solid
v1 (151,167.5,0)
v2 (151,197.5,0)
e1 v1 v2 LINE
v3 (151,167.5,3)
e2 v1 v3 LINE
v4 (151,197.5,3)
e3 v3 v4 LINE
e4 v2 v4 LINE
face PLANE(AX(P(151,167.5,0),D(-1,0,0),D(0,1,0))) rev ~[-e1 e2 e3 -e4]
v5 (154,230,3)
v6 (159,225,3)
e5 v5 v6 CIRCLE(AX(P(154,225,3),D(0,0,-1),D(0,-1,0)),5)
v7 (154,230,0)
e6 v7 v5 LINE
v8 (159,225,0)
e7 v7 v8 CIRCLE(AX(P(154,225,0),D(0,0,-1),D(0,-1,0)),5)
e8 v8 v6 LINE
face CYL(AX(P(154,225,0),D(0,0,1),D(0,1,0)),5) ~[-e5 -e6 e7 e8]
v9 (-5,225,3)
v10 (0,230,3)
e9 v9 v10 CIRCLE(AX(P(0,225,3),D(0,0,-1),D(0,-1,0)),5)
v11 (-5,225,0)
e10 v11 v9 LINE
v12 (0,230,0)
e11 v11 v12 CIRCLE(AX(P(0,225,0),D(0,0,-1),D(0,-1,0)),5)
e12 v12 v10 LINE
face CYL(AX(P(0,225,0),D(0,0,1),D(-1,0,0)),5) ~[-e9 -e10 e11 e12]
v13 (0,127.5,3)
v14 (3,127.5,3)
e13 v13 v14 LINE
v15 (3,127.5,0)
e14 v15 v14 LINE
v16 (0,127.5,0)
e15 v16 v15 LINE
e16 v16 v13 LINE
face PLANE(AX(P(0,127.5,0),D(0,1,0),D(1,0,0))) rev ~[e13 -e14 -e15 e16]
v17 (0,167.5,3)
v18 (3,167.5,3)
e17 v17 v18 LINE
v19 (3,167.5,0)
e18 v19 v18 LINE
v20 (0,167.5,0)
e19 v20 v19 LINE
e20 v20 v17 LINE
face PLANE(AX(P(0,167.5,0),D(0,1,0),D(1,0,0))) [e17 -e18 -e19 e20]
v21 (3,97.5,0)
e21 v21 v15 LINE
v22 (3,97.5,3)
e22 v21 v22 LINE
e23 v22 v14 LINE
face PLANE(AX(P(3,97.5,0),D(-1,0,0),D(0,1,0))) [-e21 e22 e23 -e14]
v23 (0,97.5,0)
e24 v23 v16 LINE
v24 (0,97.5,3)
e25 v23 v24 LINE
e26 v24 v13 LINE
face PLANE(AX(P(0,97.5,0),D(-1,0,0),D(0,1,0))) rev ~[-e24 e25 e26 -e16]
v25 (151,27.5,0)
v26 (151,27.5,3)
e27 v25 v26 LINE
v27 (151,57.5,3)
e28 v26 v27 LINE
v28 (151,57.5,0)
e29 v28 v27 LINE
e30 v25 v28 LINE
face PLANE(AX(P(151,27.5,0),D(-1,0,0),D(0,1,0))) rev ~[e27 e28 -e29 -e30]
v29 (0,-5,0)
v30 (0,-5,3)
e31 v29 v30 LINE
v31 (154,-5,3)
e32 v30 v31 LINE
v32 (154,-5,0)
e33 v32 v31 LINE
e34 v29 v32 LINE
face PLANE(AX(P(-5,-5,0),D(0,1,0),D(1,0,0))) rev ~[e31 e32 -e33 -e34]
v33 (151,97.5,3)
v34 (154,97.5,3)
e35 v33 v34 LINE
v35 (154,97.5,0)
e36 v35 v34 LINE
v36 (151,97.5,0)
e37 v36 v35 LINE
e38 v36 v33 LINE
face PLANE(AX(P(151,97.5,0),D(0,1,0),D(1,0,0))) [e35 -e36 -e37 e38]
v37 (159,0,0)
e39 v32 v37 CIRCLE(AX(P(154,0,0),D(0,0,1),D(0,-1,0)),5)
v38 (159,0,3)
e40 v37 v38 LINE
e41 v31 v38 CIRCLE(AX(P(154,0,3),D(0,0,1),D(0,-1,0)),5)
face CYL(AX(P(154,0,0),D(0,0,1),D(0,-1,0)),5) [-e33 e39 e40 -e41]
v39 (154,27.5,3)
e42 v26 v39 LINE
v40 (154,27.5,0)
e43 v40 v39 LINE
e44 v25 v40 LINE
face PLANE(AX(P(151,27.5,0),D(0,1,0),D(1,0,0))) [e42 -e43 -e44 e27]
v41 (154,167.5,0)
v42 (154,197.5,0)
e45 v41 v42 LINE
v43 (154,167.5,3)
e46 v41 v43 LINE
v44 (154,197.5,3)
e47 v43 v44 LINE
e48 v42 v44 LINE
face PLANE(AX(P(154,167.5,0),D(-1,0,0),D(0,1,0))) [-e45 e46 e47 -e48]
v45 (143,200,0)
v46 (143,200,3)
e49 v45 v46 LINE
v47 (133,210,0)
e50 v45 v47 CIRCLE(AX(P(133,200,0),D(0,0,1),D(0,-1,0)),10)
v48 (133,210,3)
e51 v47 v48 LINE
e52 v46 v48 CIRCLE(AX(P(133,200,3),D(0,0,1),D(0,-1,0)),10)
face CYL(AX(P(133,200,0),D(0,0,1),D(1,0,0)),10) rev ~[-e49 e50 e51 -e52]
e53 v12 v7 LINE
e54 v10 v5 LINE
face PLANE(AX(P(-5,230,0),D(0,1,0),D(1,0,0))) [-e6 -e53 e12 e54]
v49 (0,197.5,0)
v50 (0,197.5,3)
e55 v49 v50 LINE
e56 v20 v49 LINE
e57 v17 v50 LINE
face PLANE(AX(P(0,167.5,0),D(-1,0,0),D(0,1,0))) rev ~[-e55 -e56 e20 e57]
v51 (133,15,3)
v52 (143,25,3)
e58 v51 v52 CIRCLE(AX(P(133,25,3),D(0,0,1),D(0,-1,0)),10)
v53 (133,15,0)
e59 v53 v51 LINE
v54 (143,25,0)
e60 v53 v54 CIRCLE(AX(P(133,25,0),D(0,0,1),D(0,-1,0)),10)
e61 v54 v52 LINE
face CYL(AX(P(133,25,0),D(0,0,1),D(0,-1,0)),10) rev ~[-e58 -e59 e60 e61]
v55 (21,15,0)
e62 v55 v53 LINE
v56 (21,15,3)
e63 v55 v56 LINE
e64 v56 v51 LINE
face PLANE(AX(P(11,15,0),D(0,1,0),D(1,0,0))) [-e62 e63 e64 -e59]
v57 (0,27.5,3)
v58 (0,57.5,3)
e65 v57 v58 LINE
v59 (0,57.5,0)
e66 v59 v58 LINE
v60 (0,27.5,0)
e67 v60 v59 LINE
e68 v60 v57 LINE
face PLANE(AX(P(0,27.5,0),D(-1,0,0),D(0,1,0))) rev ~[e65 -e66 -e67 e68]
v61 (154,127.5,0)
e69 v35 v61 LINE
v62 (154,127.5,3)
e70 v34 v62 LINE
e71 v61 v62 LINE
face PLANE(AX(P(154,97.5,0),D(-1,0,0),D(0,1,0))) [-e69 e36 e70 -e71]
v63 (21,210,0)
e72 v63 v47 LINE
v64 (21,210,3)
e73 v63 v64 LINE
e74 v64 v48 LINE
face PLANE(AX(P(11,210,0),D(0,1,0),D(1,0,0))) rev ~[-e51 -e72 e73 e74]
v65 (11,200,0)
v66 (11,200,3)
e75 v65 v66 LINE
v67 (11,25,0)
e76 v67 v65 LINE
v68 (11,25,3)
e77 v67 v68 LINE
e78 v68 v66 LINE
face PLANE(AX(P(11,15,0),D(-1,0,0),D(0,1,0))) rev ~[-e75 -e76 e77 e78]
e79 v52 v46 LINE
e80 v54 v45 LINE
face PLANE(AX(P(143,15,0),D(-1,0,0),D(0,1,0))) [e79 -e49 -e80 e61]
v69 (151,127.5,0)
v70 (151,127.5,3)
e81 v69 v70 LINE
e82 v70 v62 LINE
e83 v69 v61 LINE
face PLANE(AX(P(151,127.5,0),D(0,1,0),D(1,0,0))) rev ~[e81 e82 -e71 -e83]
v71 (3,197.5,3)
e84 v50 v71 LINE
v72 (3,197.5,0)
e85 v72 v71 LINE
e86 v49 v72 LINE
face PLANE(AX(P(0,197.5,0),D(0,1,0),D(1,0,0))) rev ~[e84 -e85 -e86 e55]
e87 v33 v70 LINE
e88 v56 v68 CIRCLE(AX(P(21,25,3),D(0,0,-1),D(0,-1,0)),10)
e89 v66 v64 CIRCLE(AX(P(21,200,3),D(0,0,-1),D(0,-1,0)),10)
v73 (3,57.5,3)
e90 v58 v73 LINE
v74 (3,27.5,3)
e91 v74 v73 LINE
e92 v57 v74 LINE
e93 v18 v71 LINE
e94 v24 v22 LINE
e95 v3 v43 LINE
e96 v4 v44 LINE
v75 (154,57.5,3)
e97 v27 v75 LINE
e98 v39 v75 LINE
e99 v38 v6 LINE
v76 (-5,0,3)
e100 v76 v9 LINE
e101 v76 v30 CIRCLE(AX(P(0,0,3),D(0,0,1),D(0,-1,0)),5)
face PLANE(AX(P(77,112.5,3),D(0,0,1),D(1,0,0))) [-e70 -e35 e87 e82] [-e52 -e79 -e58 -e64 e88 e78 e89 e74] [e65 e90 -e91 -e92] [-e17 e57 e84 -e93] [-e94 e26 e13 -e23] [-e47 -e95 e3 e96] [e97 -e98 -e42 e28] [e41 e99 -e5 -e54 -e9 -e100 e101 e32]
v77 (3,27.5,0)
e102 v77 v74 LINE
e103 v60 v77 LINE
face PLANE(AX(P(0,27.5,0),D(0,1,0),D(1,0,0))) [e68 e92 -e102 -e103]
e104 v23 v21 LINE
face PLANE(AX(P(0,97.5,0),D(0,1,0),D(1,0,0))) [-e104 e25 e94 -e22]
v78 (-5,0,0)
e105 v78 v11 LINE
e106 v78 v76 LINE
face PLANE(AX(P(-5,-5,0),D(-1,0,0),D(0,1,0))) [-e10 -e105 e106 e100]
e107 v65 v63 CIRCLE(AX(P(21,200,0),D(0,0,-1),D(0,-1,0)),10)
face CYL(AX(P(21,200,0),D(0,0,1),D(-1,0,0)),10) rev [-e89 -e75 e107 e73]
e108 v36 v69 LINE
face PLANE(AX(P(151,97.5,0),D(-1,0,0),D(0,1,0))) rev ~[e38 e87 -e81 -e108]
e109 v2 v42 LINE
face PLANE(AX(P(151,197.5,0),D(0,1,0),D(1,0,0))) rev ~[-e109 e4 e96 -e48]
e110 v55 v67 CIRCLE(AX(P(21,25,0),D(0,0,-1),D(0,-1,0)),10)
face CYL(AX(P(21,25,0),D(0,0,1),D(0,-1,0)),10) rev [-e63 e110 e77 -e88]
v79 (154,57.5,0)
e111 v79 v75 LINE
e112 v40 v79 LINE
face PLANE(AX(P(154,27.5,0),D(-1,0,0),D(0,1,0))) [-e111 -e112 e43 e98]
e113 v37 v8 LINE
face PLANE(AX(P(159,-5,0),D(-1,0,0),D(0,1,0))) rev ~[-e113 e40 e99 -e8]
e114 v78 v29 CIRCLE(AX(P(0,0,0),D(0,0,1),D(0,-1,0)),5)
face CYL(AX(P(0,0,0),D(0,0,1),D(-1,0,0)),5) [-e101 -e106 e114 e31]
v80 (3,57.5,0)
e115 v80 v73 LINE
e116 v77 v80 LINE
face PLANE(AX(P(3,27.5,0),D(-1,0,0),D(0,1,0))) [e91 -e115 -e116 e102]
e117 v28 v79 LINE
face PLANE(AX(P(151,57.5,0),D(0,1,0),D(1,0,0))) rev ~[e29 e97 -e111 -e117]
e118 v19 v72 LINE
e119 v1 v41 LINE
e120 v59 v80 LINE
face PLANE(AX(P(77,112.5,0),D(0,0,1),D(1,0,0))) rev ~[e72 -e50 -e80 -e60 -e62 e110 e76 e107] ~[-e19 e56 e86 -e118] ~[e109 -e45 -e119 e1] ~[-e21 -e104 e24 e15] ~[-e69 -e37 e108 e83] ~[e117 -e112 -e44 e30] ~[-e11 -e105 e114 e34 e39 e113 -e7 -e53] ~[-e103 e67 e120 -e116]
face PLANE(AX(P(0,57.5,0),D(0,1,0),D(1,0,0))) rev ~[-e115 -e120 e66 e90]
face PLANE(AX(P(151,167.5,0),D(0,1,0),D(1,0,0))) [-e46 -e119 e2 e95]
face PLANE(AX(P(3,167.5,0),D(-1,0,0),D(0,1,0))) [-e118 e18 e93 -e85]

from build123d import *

# Parameters (mm, degrees)
F0_W     = 164
F0_H     = 235
F0_W_2   = 3
F0_H_2   = 30
F0_W_3   = 132
F0_H_3   = 195
F1_DEPTH = 3
F2_R     = 5
F3_R     = 10


with BuildPart() as f1:
    # F0 (on Top) → F1 (new body)
    with BuildSketch(Plane.XY):
        with Locations((77, 112.5)):
            Rectangle(F0_W, F0_H)
        with Locations((1.5, 42.5)):
            Rectangle(F0_W_2, F0_H_2, mode=Mode.SUBTRACT)
        with Locations((152.5, 42.5)):
            Rectangle(F0_W_2, F0_H_2, mode=Mode.SUBTRACT)
        with Locations((1.5, 112.5)):
            Rectangle(F0_W_2, F0_H_2, mode=Mode.SUBTRACT)
        with Locations((1.5, 182.5)):
            Rectangle(F0_W_2, F0_H_2, mode=Mode.SUBTRACT)
        with Locations((77, 112.5)):
            Rectangle(F0_W_3, F0_H_3, mode=Mode.SUBTRACT)
        with Locations((152.5, 112.5)):
            Rectangle(F0_W_2, F0_H_2, mode=Mode.SUBTRACT)
        with Locations((152.5, 182.5)):
            Rectangle(F0_W_2, F0_H_2, mode=Mode.SUBTRACT)
    extrude(amount=F1_DEPTH)

    # F2
    f2_edges = [f1.edges().sort_by_distance(p)[0] for p in [
        (-5, 230, 1.5),
        (159, 230, 1.5),
        (159, -5, 1.5),
        (-5, -5, 1.5),
    ]]
    fillet(f2_edges, radius=F2_R)

    # F3
    f3_edges = [f1.edges().sort_by_distance(p)[0] for p in [
        (11, 210, 1.5),
        (143, 210, 1.5),
        (143, 15, 1.5),
        (11, 15, 1.5),
    ]]
    fillet(f3_edges, radius=F3_R)


solid = f1.part
